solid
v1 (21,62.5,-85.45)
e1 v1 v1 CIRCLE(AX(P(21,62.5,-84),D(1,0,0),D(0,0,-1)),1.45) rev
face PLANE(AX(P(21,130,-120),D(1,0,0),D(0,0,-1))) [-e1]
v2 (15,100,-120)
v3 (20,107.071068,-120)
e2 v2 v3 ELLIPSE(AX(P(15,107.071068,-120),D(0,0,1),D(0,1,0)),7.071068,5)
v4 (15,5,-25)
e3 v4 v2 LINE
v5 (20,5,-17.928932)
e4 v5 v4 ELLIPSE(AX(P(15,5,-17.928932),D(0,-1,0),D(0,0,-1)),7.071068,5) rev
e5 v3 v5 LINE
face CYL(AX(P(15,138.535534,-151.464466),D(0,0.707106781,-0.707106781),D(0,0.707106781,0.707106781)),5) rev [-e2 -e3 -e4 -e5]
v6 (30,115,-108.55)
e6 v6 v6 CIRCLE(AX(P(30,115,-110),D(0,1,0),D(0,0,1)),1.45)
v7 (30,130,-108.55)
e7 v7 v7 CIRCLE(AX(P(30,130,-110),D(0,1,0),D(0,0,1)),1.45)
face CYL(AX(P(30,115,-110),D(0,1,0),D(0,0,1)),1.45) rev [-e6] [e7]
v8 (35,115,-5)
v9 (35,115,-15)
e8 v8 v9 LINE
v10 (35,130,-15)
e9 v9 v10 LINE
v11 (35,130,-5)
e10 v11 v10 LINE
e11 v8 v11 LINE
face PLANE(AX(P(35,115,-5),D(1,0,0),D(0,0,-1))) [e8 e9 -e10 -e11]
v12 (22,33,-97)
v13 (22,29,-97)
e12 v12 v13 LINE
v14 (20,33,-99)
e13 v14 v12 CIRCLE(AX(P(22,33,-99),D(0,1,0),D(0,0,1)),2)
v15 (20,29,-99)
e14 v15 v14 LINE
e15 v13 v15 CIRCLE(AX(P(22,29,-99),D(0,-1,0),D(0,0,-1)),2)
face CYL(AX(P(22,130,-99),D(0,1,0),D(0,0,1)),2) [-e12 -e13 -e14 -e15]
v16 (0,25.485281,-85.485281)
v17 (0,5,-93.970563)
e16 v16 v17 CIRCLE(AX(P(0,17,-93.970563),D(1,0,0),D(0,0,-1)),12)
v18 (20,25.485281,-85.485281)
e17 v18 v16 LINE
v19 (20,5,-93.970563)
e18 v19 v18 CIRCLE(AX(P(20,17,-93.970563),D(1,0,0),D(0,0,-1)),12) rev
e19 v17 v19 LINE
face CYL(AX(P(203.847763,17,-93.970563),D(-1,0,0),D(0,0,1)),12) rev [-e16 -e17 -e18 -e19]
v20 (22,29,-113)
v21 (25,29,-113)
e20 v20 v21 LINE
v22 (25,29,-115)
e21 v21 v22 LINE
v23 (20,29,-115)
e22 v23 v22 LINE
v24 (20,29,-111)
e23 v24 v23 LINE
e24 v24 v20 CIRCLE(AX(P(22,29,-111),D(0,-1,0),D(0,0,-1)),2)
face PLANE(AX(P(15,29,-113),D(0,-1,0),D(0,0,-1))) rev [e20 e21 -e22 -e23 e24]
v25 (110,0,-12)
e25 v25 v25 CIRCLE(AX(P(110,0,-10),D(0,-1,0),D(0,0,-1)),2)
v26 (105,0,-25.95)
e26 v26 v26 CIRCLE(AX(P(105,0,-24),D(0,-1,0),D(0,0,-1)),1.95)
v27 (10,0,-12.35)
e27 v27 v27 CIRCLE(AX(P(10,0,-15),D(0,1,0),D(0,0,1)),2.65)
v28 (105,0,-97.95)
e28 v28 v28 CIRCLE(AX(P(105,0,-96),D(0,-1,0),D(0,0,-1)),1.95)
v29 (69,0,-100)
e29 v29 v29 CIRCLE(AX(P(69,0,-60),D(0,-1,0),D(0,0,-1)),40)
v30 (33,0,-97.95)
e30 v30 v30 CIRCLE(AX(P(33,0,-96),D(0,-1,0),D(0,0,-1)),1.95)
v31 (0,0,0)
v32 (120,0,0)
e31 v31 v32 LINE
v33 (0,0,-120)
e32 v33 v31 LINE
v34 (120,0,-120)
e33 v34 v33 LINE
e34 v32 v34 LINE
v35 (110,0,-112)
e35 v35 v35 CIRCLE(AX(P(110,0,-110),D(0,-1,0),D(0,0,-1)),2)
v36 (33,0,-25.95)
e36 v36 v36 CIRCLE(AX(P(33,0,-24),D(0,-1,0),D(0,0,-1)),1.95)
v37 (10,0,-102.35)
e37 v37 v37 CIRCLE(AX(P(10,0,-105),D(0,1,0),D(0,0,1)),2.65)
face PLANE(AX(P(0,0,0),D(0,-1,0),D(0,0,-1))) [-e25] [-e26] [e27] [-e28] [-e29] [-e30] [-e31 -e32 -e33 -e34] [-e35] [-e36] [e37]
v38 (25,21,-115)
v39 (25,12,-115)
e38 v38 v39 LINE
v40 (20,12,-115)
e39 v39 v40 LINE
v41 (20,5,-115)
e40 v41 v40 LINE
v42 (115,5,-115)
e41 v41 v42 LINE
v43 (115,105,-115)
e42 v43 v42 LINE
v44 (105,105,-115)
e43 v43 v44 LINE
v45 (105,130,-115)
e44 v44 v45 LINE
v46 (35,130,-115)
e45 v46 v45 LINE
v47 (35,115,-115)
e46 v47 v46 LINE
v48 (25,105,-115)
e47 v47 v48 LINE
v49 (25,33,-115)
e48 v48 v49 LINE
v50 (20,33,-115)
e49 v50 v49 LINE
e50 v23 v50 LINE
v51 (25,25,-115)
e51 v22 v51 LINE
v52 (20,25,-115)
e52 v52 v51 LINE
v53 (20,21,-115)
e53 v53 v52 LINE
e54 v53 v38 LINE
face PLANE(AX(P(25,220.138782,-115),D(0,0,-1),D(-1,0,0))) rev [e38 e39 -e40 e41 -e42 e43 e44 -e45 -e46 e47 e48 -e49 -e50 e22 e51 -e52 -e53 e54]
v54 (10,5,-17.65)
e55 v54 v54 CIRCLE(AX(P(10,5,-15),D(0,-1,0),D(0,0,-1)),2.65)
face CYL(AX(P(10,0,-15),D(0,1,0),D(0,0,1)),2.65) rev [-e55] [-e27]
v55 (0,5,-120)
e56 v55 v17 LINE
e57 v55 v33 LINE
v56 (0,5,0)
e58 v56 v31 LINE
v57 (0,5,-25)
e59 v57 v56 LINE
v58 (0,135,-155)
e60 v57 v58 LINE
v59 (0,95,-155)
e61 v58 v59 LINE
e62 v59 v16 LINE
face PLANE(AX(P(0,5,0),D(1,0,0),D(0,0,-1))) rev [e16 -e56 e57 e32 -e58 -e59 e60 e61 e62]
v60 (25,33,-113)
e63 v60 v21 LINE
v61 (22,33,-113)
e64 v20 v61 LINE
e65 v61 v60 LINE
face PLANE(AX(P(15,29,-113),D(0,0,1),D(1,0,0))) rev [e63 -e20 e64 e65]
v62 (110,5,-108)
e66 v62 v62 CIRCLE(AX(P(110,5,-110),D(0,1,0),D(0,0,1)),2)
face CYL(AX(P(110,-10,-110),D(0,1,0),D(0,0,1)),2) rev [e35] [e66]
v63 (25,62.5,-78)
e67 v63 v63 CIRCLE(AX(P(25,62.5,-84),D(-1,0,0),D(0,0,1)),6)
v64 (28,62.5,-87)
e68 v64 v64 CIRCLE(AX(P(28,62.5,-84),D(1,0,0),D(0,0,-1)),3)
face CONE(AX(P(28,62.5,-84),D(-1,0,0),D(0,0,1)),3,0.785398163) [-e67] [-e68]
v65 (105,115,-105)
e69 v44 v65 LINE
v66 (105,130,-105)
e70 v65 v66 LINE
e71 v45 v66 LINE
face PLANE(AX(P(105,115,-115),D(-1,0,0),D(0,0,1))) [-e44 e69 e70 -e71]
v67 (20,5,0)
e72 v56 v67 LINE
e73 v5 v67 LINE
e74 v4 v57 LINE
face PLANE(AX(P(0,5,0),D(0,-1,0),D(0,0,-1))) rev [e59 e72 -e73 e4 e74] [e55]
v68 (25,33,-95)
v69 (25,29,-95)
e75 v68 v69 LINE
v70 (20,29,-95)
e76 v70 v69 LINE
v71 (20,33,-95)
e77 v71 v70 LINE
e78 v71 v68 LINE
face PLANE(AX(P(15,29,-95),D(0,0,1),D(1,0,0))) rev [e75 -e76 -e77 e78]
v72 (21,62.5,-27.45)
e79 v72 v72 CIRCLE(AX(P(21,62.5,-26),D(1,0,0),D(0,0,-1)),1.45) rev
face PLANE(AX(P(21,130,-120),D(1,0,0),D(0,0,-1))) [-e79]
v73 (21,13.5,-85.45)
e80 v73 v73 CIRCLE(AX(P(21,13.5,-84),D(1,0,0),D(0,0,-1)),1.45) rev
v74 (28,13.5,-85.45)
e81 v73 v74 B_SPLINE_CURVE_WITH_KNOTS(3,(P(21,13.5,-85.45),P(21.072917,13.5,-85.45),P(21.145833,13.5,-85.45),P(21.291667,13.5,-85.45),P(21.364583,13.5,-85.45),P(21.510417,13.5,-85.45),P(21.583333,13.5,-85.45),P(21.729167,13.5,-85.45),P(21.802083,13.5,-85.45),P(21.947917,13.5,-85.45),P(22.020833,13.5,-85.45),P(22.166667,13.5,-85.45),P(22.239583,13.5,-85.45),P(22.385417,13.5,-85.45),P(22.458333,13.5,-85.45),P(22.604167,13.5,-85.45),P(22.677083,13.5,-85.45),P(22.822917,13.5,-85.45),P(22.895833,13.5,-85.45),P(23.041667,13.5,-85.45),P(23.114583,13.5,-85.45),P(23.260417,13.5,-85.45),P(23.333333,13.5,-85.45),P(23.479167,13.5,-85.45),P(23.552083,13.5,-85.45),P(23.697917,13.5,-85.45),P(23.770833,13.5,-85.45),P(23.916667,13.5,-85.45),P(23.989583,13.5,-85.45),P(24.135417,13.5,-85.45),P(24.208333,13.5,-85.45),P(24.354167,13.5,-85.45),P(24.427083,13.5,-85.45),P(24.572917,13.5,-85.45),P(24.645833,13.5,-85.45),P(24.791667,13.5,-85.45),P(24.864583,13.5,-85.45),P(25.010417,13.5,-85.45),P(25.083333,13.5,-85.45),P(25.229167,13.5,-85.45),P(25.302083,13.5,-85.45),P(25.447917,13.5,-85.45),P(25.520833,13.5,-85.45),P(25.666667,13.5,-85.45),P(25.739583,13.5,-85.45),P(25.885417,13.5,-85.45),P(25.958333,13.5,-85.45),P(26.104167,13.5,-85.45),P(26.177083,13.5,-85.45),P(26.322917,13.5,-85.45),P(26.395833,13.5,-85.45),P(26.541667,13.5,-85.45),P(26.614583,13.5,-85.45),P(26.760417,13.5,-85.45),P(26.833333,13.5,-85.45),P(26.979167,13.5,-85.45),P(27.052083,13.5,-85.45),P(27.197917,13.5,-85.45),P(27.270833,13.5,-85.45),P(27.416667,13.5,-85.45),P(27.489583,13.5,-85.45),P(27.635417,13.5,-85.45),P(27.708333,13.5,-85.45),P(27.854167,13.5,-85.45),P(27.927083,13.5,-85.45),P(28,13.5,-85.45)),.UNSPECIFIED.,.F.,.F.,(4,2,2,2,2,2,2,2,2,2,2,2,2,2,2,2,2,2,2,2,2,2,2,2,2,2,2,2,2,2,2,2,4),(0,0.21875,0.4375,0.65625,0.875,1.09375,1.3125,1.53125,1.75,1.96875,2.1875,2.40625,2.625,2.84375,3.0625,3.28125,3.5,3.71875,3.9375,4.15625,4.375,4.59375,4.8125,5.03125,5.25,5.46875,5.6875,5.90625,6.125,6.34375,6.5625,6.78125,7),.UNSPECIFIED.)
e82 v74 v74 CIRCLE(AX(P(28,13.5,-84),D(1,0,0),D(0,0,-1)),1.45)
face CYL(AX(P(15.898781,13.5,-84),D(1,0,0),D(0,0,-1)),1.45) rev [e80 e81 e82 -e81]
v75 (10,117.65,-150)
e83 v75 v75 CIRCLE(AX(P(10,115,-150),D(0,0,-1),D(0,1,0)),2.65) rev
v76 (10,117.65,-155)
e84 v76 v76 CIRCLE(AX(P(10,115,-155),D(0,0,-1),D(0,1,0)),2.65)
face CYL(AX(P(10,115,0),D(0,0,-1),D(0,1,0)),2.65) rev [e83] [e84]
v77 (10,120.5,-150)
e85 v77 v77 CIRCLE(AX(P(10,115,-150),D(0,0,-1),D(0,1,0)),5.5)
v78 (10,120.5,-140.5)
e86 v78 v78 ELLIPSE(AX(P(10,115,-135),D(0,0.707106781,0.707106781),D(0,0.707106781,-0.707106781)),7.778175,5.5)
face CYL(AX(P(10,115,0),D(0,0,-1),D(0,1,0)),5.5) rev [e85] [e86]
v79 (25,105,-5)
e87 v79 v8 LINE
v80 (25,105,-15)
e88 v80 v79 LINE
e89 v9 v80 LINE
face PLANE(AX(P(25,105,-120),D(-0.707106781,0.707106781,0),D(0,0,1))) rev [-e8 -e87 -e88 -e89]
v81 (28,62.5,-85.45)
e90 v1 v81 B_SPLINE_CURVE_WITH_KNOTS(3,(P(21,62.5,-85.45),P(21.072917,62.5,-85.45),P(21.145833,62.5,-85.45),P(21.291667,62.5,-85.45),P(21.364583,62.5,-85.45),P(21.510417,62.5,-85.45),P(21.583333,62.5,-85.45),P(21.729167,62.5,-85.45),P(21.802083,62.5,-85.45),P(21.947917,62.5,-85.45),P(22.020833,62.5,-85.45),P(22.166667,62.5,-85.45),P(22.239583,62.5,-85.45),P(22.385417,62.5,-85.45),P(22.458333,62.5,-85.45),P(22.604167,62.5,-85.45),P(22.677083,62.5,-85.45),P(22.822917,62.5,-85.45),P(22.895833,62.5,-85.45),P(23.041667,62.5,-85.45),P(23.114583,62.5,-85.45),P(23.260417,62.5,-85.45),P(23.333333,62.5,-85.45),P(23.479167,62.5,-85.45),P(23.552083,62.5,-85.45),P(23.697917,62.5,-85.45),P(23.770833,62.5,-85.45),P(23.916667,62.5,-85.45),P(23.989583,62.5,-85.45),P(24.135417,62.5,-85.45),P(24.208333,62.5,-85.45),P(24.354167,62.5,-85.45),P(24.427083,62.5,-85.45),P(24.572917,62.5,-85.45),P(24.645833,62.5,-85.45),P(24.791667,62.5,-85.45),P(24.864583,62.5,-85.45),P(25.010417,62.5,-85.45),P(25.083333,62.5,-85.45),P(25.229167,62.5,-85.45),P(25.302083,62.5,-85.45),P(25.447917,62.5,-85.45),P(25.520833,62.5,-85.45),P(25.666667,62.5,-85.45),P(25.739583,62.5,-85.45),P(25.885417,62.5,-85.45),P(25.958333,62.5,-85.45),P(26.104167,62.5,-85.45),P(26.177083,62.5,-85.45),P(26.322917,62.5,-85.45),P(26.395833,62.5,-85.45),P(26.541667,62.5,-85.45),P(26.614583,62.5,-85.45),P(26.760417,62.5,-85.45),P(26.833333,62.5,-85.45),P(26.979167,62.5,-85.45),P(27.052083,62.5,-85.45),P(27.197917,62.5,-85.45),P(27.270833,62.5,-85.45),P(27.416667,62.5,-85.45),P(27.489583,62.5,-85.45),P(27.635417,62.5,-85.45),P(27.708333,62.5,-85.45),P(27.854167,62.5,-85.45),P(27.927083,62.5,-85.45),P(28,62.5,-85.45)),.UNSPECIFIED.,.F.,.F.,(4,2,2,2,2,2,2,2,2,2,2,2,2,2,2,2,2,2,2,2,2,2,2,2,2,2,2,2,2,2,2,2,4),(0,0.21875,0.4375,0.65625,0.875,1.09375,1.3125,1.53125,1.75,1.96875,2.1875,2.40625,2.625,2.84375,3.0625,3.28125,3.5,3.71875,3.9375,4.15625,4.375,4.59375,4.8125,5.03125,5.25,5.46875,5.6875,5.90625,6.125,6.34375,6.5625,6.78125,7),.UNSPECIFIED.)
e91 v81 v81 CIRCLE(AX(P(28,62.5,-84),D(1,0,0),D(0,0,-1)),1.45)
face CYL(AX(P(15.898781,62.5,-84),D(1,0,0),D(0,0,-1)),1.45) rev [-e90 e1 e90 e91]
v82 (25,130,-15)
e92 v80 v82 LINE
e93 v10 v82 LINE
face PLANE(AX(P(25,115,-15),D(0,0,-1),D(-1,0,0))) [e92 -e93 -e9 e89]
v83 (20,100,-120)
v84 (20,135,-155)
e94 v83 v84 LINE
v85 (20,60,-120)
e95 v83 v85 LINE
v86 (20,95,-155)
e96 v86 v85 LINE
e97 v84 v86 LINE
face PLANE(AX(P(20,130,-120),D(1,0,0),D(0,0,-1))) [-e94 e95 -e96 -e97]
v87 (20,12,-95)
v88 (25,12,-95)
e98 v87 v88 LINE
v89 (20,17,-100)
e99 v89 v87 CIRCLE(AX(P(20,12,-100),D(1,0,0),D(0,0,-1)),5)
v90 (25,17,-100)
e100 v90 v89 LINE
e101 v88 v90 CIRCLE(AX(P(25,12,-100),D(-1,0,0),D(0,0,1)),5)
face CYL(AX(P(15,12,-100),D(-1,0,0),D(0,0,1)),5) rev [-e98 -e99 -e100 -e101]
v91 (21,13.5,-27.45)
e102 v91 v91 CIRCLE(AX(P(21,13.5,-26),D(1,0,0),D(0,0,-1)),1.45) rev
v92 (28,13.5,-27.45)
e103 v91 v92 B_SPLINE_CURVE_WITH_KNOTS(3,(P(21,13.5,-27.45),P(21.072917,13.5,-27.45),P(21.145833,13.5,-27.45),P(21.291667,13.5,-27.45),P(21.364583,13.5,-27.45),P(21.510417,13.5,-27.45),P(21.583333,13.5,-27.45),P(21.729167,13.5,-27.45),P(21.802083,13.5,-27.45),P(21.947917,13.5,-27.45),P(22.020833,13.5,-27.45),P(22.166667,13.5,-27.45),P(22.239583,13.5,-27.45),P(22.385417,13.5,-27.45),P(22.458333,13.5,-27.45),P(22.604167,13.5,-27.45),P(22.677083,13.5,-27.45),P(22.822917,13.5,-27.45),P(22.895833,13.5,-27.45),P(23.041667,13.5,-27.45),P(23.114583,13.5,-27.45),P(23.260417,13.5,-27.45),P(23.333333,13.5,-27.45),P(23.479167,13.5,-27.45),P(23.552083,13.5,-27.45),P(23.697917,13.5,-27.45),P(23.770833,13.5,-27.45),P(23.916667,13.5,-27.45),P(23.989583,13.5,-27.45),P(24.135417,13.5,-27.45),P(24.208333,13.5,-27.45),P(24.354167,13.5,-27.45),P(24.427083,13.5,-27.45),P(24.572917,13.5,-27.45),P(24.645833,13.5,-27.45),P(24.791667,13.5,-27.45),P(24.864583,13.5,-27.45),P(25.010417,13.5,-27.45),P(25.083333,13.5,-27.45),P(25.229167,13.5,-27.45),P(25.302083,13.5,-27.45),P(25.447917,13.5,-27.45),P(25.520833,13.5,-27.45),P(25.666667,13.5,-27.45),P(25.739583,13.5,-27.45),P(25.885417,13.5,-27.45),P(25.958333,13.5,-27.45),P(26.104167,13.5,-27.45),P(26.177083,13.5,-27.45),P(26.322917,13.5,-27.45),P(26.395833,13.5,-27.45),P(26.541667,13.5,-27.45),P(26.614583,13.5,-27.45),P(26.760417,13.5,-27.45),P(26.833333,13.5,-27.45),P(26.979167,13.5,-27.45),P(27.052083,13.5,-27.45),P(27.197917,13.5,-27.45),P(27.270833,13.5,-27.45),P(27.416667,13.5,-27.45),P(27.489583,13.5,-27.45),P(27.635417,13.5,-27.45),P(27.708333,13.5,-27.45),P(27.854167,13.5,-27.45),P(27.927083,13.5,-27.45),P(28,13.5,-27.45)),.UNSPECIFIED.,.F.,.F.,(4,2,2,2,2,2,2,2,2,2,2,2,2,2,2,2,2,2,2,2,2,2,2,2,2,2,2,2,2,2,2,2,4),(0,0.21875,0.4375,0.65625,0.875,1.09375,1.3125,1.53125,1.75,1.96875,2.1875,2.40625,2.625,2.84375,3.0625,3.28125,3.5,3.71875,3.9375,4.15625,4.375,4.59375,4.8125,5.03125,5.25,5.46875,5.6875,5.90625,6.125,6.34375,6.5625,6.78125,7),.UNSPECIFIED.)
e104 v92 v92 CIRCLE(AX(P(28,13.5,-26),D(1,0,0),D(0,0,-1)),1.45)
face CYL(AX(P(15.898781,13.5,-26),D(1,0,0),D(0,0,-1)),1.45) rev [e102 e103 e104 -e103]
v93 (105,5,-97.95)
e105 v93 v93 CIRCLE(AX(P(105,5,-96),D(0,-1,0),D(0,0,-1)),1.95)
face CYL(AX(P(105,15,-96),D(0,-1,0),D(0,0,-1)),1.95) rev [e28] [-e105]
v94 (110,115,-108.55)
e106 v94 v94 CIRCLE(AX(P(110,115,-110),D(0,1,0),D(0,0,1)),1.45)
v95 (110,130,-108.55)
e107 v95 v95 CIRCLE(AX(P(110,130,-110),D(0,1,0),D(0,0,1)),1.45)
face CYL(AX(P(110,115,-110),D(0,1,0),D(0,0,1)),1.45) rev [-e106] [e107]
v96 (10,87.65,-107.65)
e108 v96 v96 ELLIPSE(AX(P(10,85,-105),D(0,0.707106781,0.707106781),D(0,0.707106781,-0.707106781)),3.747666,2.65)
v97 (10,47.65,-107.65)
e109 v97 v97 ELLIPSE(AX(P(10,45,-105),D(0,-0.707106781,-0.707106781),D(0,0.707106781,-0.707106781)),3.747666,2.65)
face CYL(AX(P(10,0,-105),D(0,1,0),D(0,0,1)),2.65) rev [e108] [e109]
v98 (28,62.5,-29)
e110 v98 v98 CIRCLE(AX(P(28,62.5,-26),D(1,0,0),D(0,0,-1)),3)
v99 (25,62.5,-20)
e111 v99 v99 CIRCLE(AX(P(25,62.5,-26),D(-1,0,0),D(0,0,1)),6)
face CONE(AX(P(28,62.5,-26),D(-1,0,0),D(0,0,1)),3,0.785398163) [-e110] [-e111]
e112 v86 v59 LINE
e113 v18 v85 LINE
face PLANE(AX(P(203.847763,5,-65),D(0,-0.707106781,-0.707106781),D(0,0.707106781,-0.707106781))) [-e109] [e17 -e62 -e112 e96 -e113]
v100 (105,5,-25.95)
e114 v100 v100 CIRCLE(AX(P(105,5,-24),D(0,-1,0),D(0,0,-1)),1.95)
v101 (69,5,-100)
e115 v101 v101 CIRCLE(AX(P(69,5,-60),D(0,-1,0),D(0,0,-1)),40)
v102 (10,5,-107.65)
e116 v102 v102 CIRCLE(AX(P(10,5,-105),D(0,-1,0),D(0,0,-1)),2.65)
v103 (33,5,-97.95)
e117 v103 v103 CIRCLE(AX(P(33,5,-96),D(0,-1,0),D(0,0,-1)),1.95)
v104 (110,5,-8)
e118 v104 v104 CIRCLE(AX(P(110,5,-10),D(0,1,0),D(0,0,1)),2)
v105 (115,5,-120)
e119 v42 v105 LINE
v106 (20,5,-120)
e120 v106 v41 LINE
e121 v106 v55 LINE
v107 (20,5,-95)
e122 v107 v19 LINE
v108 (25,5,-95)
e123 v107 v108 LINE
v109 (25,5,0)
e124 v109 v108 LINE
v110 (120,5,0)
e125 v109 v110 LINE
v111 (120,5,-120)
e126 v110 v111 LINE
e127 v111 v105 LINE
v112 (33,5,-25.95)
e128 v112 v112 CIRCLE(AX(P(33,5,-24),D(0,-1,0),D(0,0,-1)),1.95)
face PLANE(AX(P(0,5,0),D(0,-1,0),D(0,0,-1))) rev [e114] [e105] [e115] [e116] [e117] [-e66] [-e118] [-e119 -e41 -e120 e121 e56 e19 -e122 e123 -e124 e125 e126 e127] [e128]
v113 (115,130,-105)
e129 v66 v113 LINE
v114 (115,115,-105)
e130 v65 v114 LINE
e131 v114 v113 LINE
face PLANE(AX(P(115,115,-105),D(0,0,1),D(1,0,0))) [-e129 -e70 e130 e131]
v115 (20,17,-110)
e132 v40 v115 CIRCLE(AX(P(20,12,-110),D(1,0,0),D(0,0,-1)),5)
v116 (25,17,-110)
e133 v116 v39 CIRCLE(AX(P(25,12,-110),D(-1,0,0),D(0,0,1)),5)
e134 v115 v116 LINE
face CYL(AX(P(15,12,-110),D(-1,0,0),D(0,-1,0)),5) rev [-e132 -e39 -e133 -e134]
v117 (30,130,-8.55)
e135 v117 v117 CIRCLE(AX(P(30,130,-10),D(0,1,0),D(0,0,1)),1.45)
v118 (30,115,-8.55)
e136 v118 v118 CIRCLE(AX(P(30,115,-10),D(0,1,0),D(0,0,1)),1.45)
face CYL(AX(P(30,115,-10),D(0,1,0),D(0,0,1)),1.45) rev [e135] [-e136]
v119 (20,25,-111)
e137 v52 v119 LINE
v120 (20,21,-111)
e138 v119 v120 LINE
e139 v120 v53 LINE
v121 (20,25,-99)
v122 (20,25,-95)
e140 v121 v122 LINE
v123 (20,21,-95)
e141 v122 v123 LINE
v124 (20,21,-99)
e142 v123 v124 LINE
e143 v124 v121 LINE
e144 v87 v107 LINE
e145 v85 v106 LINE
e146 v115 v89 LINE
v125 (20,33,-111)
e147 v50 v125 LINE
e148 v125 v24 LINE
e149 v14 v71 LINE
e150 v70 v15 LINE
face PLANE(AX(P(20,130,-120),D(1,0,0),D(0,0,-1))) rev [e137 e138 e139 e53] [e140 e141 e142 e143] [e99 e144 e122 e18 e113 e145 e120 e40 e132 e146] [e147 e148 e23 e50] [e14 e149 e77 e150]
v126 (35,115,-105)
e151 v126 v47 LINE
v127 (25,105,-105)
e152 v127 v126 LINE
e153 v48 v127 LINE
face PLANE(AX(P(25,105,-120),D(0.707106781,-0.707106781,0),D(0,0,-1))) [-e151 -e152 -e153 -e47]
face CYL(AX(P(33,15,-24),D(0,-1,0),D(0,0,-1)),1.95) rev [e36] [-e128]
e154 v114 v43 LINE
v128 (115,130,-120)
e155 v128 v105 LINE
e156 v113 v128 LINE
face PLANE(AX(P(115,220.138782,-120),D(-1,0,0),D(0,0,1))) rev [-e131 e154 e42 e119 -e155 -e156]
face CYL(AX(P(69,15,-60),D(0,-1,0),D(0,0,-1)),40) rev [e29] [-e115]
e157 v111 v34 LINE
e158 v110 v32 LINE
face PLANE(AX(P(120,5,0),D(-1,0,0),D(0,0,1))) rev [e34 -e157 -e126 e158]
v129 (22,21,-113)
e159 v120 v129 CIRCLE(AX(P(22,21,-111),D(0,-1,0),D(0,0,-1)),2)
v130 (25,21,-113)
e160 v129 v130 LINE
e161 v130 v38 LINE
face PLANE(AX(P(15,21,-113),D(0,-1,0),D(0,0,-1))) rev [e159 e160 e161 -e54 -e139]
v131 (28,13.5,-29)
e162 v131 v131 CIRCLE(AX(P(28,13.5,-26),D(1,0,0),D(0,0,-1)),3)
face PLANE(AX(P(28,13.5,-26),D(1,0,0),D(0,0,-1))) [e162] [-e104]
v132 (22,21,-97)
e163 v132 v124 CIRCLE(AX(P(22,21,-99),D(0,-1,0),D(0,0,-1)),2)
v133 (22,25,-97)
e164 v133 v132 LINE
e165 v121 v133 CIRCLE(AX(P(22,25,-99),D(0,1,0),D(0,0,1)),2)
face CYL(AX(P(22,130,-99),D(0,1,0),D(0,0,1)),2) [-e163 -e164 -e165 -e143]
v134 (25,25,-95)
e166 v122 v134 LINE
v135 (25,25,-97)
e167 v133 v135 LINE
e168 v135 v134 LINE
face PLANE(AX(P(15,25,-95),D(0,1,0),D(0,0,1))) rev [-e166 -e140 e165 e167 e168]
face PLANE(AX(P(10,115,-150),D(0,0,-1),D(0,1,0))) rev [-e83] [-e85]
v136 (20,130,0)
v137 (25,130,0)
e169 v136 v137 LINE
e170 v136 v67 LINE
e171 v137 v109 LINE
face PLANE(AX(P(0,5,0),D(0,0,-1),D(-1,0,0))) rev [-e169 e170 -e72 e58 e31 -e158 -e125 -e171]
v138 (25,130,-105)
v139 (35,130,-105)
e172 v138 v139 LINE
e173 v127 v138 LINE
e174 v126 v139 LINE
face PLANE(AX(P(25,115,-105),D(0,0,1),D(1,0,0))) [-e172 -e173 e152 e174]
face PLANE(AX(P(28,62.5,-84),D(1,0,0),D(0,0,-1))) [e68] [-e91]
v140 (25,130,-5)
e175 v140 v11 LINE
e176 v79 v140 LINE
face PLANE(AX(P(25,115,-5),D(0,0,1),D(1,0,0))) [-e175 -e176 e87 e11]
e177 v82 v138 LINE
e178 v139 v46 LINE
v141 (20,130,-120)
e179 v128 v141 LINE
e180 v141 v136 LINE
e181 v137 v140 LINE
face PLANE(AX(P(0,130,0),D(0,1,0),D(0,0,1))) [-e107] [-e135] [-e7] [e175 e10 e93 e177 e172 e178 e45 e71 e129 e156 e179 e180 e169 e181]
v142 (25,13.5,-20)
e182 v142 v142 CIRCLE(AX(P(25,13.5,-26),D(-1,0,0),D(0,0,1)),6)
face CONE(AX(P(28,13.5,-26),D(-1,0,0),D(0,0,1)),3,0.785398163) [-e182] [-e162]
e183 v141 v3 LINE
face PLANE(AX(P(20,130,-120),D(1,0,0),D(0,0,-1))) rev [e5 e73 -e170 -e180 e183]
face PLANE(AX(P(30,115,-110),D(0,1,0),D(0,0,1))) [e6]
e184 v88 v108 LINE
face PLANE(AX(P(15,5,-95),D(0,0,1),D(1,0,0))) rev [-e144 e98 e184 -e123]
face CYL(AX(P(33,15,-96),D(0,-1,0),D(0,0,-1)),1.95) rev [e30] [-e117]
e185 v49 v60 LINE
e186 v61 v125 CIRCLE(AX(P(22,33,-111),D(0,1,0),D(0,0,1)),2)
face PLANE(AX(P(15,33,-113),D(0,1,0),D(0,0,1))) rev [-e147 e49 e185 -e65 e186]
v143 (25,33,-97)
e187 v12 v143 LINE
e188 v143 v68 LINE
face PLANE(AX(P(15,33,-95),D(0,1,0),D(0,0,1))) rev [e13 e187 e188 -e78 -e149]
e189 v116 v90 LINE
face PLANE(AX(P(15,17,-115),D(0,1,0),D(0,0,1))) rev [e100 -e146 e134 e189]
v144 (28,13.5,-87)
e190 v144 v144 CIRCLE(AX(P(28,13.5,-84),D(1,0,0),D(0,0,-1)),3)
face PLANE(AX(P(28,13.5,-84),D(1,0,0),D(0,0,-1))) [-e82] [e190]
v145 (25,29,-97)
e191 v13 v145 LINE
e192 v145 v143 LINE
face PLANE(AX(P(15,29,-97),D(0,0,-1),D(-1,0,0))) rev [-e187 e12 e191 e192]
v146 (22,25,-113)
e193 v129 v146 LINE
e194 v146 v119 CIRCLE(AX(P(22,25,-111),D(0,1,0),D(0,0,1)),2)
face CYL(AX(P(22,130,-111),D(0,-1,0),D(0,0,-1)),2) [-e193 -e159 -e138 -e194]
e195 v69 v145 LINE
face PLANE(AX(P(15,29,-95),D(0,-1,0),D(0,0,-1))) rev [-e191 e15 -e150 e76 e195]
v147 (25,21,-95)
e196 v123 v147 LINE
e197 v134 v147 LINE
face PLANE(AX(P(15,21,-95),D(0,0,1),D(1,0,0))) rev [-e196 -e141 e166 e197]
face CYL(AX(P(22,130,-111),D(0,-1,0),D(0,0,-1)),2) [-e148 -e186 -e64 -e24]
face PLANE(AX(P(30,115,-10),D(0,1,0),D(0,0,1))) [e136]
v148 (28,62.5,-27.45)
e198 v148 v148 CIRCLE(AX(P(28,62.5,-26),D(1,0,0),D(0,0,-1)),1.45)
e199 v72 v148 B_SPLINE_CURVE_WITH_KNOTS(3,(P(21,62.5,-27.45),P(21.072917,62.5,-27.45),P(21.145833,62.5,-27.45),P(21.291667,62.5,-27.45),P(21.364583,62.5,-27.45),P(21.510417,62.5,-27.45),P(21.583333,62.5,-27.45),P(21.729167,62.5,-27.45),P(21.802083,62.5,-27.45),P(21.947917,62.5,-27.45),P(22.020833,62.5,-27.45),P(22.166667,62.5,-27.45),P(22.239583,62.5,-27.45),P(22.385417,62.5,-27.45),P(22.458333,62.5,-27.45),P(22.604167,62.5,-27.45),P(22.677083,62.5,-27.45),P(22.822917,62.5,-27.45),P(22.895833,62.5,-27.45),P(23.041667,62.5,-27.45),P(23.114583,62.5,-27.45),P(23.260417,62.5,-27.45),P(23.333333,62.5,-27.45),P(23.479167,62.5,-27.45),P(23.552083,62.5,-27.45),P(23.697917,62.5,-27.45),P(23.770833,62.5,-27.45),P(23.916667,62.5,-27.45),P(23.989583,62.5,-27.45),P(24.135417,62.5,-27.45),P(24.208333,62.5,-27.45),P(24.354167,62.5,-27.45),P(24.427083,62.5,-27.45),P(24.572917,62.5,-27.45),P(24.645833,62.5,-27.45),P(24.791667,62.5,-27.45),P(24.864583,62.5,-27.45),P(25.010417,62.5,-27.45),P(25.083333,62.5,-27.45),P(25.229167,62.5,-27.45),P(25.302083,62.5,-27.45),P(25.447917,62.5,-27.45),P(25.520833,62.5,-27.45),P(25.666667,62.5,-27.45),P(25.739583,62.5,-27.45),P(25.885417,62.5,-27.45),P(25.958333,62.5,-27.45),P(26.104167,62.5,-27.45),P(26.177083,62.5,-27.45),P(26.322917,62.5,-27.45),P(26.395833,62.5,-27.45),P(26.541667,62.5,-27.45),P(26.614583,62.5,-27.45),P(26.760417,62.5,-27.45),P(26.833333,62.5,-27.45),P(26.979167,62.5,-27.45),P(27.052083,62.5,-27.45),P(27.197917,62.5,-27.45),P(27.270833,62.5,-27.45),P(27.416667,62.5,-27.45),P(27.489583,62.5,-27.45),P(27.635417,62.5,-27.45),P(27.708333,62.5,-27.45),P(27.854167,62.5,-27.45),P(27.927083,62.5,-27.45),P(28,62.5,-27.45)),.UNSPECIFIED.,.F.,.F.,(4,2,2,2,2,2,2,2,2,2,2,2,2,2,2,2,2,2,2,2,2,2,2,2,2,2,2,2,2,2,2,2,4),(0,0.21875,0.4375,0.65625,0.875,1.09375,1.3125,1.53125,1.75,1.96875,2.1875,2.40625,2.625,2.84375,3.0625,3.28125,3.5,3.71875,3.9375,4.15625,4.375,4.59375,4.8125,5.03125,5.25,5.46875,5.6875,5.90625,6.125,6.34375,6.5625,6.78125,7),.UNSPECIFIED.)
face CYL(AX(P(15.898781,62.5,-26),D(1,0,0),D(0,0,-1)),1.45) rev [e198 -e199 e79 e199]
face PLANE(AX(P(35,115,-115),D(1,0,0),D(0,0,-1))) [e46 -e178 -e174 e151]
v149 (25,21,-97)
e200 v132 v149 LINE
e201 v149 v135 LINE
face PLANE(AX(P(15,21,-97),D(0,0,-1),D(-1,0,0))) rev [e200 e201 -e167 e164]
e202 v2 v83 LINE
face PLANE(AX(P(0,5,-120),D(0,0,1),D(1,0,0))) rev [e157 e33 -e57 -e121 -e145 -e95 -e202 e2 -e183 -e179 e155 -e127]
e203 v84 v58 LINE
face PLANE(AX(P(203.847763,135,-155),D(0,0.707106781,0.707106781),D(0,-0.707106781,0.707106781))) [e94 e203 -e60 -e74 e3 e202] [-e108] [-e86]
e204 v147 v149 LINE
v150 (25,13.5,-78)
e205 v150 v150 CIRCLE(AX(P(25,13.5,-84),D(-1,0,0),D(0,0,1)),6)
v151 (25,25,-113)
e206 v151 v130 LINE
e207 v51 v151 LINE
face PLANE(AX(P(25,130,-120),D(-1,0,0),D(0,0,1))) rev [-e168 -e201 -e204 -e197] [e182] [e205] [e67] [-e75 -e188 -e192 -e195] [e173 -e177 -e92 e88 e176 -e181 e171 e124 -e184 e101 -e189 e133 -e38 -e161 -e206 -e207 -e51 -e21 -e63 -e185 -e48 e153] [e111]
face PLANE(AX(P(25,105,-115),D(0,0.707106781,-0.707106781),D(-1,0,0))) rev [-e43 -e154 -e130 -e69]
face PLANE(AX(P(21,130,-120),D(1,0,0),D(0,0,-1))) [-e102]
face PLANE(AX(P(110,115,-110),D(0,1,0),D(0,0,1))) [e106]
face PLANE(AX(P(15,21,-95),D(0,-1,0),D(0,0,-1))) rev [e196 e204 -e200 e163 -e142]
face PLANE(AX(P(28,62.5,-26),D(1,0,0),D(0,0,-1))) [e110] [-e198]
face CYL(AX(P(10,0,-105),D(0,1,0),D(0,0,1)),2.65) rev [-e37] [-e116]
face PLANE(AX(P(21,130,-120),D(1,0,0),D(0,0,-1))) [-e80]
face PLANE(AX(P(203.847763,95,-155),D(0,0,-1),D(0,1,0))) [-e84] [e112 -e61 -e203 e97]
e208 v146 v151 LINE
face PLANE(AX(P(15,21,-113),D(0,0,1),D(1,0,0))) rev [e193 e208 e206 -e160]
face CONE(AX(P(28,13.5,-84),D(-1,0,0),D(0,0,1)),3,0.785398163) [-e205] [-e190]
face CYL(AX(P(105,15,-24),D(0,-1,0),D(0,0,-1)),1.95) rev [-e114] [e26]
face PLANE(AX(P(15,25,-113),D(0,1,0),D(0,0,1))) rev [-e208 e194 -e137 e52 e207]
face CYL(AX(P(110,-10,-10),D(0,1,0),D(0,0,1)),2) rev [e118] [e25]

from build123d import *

# Parameters (mm, degrees)
SKETCH1_W               = 120
SKETCH1_H               = 120
BOSS_EXTRUDE1_DEPTH     = 5
SKETCH5_W               = 5
SKETCH5_H               = 120
BOSS_EXTRUDE3_DEPTH     = 125
SKETCH15_W              = 90
SKETCH15_H              = 5
BOSS_EXTRUDE9_DEPTH     = 125
SKETCH3_R               = 40
CUT_EXTRUDE1_DEPTH      = 15
SKETCH4_R               = 1.95
CUT_EXTRUDE2_DEPTH      = 15
SKETCH6_R               = 3
BOSS_EXTRUDE4_DEPTH     = 3
SKETCH7_R               = 1.45
CUT_EXTRUDE3_DEPTH      = 7
BOSS_EXTRUDE8_DEPTH     = 20
CUT_EXTRUDE6_DEPTH      = 236.212669727
CUT_EXTRUDE6_DEPTH_BACK = 236.212669727
SKETCH12_R              = 2.65
CHAMFER3_SIZE           = 3
SKETCH17_W              = 10
SKETCH17_H              = 10
BOSS_EXTRUDE10_DEPTH    = 15
CHAMFER4_SIZE           = 10
SKETCH18_R              = 2
CUT_EXTRUDE8_DEPTH      = 15
SKETCH19_R              = 1.45
CUT_EXTRUDE9_DEPTH      = 15
FILLET4_R               = 12
SKETCH20_R              = 2.65
CUT_EXTRUDE10_DEPTH     = 239.012604708
SKETCH21_R              = 5.5
CUT_EXTRUDE11_DEPTH     = 235.787137637
FILLET5_R               = 5
SKETCH23_W              = 20
SKETCH23_H              = 12
SKETCH23_W_2            = 2
SKETCH23_H_2            = 4
CUT_EXTRUDE12_DEPTH     = 10
FILLET6_R               = 5
FILLET7_R               = 2


with BuildPart() as part:
    # Sketch1 → Boss-Extrude1 (new body)
    with BuildSketch(Plane(origin=(0, 0, 0), x_dir=(1, 0, 0), z_dir=(0, 1, 0))):
        with Locations((60, 60)):
            Rectangle(SKETCH1_W, SKETCH1_H)
    extrude(amount=BOSS_EXTRUDE1_DEPTH)

    # Sketch5 → Boss-Extrude3 (add)
    with BuildSketch(Plane(origin=(0, 5, 0), x_dir=(1, 0, 0), z_dir=(0, 1, 0))):
        with Locations((22.5, 60)):
            Rectangle(SKETCH5_W, SKETCH5_H)
    extrude(amount=BOSS_EXTRUDE3_DEPTH)

    # Sketch15 → Boss-Extrude9 (add)
    with BuildSketch(Plane(origin=(0, 5, 0), x_dir=(1, 0, 0), z_dir=(0, 1, 0))):
        with Locations((70, 117.5)):
            Rectangle(SKETCH15_W, SKETCH15_H)
    extrude(amount=BOSS_EXTRUDE9_DEPTH)

    # Sketch3 → Cut-Extrude1 (cut)
    with BuildSketch(Plane.XZ):
        with Locations(Location((69, -60, 0), (0, 0, 270))):
            Circle(SKETCH3_R)
    extrude(amount=-CUT_EXTRUDE1_DEPTH, mode=Mode.SUBTRACT)

    # Sketch4 → Cut-Extrude2 (cut)
    with BuildSketch(Plane.XZ):
        with Locations(Location((33, -24, 0), (0, 0, 270))):
            Circle(SKETCH4_R)
        with Locations(Location((105, -24, 0), (0, 0, 270))):
            Circle(SKETCH4_R)
        with Locations(Location((105, -96, 0), (0, 0, 270))):
            Circle(SKETCH4_R)
        with Locations(Location((33, -96, 0), (0, 0, 270))):
            Circle(SKETCH4_R)
    extrude(amount=-CUT_EXTRUDE2_DEPTH, mode=Mode.SUBTRACT)

    # Sketch6 → Boss-Extrude4 (add)
    with BuildSketch(Plane(origin=(25, 0, 0), x_dir=(0, 0, -1), z_dir=(1, 0, 0))):
        with Locations(Location((26, 62.5, 0), (0, 0, 180))):
            Circle(SKETCH6_R)
        with Locations(Location((84, 62.5, 0), (0, 0, 180))):
            Circle(SKETCH6_R)
        with Locations(Location((84, 13.5, 0), (0, 0, 180))):
            Circle(SKETCH6_R)
        with Locations(Location((26, 13.5, 0), (0, 0, 180))):
            Circle(SKETCH6_R)
    extrude(amount=BOSS_EXTRUDE4_DEPTH)

    # Sketch7 → Cut-Extrude3 (cut)
    with BuildSketch(Plane(origin=(28, 0, 0), x_dir=(0, 0, -1), z_dir=(1, 0, 0))):
        with Locations((26, 62.5)):
            Circle(SKETCH7_R)
        with Locations((84, 62.5)):
            Circle(SKETCH7_R)
        with Locations((84, 13.5)):
            Circle(SKETCH7_R)
        with Locations((26, 13.5)):
            Circle(SKETCH7_R)
    extrude(amount=-CUT_EXTRUDE3_DEPTH, mode=Mode.SUBTRACT)

    # Sketch14 → Boss-Extrude8 (add)
    with BuildSketch(Plane.ZY):
        Polygon((-25, 5), (-65, 5), (-155, 95), (-155, 135), align=None)
    extrude(amount=-BOSS_EXTRUDE8_DEPTH)

    # Sketch12 → Cut-Extrude6 (cut, two sides: drawn at the far end of the back side and taken through both)
    with BuildSketch(Plane(origin=(0, 5, 0), x_dir=(1, 0, 0), z_dir=(0, 1, 0)).offset(-CUT_EXTRUDE6_DEPTH_BACK)):
        with Locations(Location((10, 105, 0), (0, 0, 90))):
            Circle(SKETCH12_R)
        with Locations(Location((10, 15, 0), (0, 0, 270))):
            Circle(SKETCH12_R)
    extrude(amount=CUT_EXTRUDE6_DEPTH + CUT_EXTRUDE6_DEPTH_BACK, mode=Mode.SUBTRACT)

    # Chamfer3
    chamfer3_edges = [part.edges().sort_by_distance(p)[0] for p in [
        (25, 62.5, -29),
        (25, 62.5, -87),
        (25, 13.5, -87),
        (25, 13.5, -29),
    ]]
    chamfer(chamfer3_edges, length=CHAMFER3_SIZE - 0.0001)  # a hair under: the kernel refuses the full size

    # Sketch17 → Boss-Extrude10 (add)
    with BuildSketch(Plane(origin=(0, 130, 0), x_dir=(1, 0, 0), z_dir=(0, 1, 0))):
        with Locations((30, 110)):
            Rectangle(SKETCH17_W, SKETCH17_H)
        with Locations((110, 110)):
            Rectangle(SKETCH17_W, SKETCH17_H)
        with Locations((30, 10)):
            Rectangle(SKETCH17_W, SKETCH17_H)
    extrude(amount=-BOSS_EXTRUDE10_DEPTH)

    # Chamfer4
    chamfer4_edges = [part.edges().sort_by_distance(p)[0] for p in [
        (110, 115, -115),
        (25, 115, -10),
        (25, 115, -110),
    ]]
    chamfer(chamfer4_edges, length=CHAMFER4_SIZE - 0.0001)  # a hair under: the kernel refuses the full size

    # Sketch18 → Cut-Extrude8 (cut)
    with BuildSketch(Plane(origin=(0, 5, 0), x_dir=(1, 0, 0), z_dir=(0, 1, 0))):
        with Locations(Location((110, 10, 0), (0, 0, 270))):
            Circle(SKETCH18_R)
        with Locations(Location((110, 110, 0), (0, 0, 270))):
            Circle(SKETCH18_R)
    extrude(amount=-CUT_EXTRUDE8_DEPTH, mode=Mode.SUBTRACT)

    # Sketch19 → Cut-Extrude9 (cut)
    with BuildSketch(Plane(origin=(0, 130, 0), x_dir=(1, 0, 0), z_dir=(0, 1, 0))):
        with Locations(Location((30, 110, 0), (0, 0, 270))):
            Circle(SKETCH19_R)
        with Locations(Location((110, 110, 0), (0, 0, 270))):
            Circle(SKETCH19_R)
        with Locations(Location((30, 10, 0), (0, 0, 270))):
            Circle(SKETCH19_R)
    extrude(amount=-CUT_EXTRUDE9_DEPTH, mode=Mode.SUBTRACT)

    # Fillet4
    fillet4_edges = [part.edges().sort_by_distance(p)[0] for p in [
        (10, 5, -65),
    ]]
    fillet(fillet4_edges, radius=FILLET4_R)

    # Sketch20 → Cut-Extrude10 (cut, through all)
    with BuildSketch(Plane(origin=(0, 0, -155), x_dir=(-1, 0, 0), z_dir=(0, 0, -1))):
        with Locations(Location((-10, 115, 0), (0, 0, 90))):
            Circle(SKETCH20_R)
    extrude(amount=-CUT_EXTRUDE10_DEPTH, mode=Mode.SUBTRACT)

    # Sketch21 → Cut-Extrude11 (cut, through all)
    with BuildSketch(Plane(origin=(0, 0, -150), x_dir=(-1, 0, 0), z_dir=(0, 0, -1))):
        with Locations(Location((-10, 115, 0), (0, 0, 90))):
            Circle(SKETCH21_R)
    extrude(amount=-CUT_EXTRUDE11_DEPTH, mode=Mode.SUBTRACT)

    # Fillet5
    fillet5_edges = [part.edges().sort_by_distance(p)[0] for p in [
        (20, 52.5, -72.5),
    ]]
    fillet(fillet5_edges, radius=FILLET5_R)

    # Sketch23 → Cut-Extrude12 (cut)
    with BuildSketch(Plane(origin=(25, 0, 0), x_dir=(0, 0, -1), z_dir=(1, 0, 0))):
        with Locations((105, 11)):
            Rectangle(SKETCH23_W, SKETCH23_H)
        with Locations((96, 23)):
            Rectangle(SKETCH23_W_2, SKETCH23_H_2)
        with Locations((114, 23)):
            Rectangle(SKETCH23_W_2, SKETCH23_H_2)
        with Locations((114, 31)):
            Rectangle(SKETCH23_W_2, SKETCH23_H_2)
        with Locations((96, 31)):
            Rectangle(SKETCH23_W_2, SKETCH23_H_2)
    extrude(amount=-CUT_EXTRUDE12_DEPTH, mode=Mode.SUBTRACT)

    # Fillet6
    fillet6_edges = [part.edges().sort_by_distance(p)[0] for p in [
        (22.5, 17, -115),
        (22.5, 17, -95),
    ]]
    fillet(fillet6_edges, radius=FILLET6_R)

    # Fillet7
    fillet7_edges = [part.edges().sort_by_distance(p)[0] for p in [
        (20, 31, -113),
        (20, 31, -97),
        (20, 23, -113),
        (20, 23, -97),
    ]]
    fillet(fillet7_edges, radius=FILLET7_R)


solid = part.part
